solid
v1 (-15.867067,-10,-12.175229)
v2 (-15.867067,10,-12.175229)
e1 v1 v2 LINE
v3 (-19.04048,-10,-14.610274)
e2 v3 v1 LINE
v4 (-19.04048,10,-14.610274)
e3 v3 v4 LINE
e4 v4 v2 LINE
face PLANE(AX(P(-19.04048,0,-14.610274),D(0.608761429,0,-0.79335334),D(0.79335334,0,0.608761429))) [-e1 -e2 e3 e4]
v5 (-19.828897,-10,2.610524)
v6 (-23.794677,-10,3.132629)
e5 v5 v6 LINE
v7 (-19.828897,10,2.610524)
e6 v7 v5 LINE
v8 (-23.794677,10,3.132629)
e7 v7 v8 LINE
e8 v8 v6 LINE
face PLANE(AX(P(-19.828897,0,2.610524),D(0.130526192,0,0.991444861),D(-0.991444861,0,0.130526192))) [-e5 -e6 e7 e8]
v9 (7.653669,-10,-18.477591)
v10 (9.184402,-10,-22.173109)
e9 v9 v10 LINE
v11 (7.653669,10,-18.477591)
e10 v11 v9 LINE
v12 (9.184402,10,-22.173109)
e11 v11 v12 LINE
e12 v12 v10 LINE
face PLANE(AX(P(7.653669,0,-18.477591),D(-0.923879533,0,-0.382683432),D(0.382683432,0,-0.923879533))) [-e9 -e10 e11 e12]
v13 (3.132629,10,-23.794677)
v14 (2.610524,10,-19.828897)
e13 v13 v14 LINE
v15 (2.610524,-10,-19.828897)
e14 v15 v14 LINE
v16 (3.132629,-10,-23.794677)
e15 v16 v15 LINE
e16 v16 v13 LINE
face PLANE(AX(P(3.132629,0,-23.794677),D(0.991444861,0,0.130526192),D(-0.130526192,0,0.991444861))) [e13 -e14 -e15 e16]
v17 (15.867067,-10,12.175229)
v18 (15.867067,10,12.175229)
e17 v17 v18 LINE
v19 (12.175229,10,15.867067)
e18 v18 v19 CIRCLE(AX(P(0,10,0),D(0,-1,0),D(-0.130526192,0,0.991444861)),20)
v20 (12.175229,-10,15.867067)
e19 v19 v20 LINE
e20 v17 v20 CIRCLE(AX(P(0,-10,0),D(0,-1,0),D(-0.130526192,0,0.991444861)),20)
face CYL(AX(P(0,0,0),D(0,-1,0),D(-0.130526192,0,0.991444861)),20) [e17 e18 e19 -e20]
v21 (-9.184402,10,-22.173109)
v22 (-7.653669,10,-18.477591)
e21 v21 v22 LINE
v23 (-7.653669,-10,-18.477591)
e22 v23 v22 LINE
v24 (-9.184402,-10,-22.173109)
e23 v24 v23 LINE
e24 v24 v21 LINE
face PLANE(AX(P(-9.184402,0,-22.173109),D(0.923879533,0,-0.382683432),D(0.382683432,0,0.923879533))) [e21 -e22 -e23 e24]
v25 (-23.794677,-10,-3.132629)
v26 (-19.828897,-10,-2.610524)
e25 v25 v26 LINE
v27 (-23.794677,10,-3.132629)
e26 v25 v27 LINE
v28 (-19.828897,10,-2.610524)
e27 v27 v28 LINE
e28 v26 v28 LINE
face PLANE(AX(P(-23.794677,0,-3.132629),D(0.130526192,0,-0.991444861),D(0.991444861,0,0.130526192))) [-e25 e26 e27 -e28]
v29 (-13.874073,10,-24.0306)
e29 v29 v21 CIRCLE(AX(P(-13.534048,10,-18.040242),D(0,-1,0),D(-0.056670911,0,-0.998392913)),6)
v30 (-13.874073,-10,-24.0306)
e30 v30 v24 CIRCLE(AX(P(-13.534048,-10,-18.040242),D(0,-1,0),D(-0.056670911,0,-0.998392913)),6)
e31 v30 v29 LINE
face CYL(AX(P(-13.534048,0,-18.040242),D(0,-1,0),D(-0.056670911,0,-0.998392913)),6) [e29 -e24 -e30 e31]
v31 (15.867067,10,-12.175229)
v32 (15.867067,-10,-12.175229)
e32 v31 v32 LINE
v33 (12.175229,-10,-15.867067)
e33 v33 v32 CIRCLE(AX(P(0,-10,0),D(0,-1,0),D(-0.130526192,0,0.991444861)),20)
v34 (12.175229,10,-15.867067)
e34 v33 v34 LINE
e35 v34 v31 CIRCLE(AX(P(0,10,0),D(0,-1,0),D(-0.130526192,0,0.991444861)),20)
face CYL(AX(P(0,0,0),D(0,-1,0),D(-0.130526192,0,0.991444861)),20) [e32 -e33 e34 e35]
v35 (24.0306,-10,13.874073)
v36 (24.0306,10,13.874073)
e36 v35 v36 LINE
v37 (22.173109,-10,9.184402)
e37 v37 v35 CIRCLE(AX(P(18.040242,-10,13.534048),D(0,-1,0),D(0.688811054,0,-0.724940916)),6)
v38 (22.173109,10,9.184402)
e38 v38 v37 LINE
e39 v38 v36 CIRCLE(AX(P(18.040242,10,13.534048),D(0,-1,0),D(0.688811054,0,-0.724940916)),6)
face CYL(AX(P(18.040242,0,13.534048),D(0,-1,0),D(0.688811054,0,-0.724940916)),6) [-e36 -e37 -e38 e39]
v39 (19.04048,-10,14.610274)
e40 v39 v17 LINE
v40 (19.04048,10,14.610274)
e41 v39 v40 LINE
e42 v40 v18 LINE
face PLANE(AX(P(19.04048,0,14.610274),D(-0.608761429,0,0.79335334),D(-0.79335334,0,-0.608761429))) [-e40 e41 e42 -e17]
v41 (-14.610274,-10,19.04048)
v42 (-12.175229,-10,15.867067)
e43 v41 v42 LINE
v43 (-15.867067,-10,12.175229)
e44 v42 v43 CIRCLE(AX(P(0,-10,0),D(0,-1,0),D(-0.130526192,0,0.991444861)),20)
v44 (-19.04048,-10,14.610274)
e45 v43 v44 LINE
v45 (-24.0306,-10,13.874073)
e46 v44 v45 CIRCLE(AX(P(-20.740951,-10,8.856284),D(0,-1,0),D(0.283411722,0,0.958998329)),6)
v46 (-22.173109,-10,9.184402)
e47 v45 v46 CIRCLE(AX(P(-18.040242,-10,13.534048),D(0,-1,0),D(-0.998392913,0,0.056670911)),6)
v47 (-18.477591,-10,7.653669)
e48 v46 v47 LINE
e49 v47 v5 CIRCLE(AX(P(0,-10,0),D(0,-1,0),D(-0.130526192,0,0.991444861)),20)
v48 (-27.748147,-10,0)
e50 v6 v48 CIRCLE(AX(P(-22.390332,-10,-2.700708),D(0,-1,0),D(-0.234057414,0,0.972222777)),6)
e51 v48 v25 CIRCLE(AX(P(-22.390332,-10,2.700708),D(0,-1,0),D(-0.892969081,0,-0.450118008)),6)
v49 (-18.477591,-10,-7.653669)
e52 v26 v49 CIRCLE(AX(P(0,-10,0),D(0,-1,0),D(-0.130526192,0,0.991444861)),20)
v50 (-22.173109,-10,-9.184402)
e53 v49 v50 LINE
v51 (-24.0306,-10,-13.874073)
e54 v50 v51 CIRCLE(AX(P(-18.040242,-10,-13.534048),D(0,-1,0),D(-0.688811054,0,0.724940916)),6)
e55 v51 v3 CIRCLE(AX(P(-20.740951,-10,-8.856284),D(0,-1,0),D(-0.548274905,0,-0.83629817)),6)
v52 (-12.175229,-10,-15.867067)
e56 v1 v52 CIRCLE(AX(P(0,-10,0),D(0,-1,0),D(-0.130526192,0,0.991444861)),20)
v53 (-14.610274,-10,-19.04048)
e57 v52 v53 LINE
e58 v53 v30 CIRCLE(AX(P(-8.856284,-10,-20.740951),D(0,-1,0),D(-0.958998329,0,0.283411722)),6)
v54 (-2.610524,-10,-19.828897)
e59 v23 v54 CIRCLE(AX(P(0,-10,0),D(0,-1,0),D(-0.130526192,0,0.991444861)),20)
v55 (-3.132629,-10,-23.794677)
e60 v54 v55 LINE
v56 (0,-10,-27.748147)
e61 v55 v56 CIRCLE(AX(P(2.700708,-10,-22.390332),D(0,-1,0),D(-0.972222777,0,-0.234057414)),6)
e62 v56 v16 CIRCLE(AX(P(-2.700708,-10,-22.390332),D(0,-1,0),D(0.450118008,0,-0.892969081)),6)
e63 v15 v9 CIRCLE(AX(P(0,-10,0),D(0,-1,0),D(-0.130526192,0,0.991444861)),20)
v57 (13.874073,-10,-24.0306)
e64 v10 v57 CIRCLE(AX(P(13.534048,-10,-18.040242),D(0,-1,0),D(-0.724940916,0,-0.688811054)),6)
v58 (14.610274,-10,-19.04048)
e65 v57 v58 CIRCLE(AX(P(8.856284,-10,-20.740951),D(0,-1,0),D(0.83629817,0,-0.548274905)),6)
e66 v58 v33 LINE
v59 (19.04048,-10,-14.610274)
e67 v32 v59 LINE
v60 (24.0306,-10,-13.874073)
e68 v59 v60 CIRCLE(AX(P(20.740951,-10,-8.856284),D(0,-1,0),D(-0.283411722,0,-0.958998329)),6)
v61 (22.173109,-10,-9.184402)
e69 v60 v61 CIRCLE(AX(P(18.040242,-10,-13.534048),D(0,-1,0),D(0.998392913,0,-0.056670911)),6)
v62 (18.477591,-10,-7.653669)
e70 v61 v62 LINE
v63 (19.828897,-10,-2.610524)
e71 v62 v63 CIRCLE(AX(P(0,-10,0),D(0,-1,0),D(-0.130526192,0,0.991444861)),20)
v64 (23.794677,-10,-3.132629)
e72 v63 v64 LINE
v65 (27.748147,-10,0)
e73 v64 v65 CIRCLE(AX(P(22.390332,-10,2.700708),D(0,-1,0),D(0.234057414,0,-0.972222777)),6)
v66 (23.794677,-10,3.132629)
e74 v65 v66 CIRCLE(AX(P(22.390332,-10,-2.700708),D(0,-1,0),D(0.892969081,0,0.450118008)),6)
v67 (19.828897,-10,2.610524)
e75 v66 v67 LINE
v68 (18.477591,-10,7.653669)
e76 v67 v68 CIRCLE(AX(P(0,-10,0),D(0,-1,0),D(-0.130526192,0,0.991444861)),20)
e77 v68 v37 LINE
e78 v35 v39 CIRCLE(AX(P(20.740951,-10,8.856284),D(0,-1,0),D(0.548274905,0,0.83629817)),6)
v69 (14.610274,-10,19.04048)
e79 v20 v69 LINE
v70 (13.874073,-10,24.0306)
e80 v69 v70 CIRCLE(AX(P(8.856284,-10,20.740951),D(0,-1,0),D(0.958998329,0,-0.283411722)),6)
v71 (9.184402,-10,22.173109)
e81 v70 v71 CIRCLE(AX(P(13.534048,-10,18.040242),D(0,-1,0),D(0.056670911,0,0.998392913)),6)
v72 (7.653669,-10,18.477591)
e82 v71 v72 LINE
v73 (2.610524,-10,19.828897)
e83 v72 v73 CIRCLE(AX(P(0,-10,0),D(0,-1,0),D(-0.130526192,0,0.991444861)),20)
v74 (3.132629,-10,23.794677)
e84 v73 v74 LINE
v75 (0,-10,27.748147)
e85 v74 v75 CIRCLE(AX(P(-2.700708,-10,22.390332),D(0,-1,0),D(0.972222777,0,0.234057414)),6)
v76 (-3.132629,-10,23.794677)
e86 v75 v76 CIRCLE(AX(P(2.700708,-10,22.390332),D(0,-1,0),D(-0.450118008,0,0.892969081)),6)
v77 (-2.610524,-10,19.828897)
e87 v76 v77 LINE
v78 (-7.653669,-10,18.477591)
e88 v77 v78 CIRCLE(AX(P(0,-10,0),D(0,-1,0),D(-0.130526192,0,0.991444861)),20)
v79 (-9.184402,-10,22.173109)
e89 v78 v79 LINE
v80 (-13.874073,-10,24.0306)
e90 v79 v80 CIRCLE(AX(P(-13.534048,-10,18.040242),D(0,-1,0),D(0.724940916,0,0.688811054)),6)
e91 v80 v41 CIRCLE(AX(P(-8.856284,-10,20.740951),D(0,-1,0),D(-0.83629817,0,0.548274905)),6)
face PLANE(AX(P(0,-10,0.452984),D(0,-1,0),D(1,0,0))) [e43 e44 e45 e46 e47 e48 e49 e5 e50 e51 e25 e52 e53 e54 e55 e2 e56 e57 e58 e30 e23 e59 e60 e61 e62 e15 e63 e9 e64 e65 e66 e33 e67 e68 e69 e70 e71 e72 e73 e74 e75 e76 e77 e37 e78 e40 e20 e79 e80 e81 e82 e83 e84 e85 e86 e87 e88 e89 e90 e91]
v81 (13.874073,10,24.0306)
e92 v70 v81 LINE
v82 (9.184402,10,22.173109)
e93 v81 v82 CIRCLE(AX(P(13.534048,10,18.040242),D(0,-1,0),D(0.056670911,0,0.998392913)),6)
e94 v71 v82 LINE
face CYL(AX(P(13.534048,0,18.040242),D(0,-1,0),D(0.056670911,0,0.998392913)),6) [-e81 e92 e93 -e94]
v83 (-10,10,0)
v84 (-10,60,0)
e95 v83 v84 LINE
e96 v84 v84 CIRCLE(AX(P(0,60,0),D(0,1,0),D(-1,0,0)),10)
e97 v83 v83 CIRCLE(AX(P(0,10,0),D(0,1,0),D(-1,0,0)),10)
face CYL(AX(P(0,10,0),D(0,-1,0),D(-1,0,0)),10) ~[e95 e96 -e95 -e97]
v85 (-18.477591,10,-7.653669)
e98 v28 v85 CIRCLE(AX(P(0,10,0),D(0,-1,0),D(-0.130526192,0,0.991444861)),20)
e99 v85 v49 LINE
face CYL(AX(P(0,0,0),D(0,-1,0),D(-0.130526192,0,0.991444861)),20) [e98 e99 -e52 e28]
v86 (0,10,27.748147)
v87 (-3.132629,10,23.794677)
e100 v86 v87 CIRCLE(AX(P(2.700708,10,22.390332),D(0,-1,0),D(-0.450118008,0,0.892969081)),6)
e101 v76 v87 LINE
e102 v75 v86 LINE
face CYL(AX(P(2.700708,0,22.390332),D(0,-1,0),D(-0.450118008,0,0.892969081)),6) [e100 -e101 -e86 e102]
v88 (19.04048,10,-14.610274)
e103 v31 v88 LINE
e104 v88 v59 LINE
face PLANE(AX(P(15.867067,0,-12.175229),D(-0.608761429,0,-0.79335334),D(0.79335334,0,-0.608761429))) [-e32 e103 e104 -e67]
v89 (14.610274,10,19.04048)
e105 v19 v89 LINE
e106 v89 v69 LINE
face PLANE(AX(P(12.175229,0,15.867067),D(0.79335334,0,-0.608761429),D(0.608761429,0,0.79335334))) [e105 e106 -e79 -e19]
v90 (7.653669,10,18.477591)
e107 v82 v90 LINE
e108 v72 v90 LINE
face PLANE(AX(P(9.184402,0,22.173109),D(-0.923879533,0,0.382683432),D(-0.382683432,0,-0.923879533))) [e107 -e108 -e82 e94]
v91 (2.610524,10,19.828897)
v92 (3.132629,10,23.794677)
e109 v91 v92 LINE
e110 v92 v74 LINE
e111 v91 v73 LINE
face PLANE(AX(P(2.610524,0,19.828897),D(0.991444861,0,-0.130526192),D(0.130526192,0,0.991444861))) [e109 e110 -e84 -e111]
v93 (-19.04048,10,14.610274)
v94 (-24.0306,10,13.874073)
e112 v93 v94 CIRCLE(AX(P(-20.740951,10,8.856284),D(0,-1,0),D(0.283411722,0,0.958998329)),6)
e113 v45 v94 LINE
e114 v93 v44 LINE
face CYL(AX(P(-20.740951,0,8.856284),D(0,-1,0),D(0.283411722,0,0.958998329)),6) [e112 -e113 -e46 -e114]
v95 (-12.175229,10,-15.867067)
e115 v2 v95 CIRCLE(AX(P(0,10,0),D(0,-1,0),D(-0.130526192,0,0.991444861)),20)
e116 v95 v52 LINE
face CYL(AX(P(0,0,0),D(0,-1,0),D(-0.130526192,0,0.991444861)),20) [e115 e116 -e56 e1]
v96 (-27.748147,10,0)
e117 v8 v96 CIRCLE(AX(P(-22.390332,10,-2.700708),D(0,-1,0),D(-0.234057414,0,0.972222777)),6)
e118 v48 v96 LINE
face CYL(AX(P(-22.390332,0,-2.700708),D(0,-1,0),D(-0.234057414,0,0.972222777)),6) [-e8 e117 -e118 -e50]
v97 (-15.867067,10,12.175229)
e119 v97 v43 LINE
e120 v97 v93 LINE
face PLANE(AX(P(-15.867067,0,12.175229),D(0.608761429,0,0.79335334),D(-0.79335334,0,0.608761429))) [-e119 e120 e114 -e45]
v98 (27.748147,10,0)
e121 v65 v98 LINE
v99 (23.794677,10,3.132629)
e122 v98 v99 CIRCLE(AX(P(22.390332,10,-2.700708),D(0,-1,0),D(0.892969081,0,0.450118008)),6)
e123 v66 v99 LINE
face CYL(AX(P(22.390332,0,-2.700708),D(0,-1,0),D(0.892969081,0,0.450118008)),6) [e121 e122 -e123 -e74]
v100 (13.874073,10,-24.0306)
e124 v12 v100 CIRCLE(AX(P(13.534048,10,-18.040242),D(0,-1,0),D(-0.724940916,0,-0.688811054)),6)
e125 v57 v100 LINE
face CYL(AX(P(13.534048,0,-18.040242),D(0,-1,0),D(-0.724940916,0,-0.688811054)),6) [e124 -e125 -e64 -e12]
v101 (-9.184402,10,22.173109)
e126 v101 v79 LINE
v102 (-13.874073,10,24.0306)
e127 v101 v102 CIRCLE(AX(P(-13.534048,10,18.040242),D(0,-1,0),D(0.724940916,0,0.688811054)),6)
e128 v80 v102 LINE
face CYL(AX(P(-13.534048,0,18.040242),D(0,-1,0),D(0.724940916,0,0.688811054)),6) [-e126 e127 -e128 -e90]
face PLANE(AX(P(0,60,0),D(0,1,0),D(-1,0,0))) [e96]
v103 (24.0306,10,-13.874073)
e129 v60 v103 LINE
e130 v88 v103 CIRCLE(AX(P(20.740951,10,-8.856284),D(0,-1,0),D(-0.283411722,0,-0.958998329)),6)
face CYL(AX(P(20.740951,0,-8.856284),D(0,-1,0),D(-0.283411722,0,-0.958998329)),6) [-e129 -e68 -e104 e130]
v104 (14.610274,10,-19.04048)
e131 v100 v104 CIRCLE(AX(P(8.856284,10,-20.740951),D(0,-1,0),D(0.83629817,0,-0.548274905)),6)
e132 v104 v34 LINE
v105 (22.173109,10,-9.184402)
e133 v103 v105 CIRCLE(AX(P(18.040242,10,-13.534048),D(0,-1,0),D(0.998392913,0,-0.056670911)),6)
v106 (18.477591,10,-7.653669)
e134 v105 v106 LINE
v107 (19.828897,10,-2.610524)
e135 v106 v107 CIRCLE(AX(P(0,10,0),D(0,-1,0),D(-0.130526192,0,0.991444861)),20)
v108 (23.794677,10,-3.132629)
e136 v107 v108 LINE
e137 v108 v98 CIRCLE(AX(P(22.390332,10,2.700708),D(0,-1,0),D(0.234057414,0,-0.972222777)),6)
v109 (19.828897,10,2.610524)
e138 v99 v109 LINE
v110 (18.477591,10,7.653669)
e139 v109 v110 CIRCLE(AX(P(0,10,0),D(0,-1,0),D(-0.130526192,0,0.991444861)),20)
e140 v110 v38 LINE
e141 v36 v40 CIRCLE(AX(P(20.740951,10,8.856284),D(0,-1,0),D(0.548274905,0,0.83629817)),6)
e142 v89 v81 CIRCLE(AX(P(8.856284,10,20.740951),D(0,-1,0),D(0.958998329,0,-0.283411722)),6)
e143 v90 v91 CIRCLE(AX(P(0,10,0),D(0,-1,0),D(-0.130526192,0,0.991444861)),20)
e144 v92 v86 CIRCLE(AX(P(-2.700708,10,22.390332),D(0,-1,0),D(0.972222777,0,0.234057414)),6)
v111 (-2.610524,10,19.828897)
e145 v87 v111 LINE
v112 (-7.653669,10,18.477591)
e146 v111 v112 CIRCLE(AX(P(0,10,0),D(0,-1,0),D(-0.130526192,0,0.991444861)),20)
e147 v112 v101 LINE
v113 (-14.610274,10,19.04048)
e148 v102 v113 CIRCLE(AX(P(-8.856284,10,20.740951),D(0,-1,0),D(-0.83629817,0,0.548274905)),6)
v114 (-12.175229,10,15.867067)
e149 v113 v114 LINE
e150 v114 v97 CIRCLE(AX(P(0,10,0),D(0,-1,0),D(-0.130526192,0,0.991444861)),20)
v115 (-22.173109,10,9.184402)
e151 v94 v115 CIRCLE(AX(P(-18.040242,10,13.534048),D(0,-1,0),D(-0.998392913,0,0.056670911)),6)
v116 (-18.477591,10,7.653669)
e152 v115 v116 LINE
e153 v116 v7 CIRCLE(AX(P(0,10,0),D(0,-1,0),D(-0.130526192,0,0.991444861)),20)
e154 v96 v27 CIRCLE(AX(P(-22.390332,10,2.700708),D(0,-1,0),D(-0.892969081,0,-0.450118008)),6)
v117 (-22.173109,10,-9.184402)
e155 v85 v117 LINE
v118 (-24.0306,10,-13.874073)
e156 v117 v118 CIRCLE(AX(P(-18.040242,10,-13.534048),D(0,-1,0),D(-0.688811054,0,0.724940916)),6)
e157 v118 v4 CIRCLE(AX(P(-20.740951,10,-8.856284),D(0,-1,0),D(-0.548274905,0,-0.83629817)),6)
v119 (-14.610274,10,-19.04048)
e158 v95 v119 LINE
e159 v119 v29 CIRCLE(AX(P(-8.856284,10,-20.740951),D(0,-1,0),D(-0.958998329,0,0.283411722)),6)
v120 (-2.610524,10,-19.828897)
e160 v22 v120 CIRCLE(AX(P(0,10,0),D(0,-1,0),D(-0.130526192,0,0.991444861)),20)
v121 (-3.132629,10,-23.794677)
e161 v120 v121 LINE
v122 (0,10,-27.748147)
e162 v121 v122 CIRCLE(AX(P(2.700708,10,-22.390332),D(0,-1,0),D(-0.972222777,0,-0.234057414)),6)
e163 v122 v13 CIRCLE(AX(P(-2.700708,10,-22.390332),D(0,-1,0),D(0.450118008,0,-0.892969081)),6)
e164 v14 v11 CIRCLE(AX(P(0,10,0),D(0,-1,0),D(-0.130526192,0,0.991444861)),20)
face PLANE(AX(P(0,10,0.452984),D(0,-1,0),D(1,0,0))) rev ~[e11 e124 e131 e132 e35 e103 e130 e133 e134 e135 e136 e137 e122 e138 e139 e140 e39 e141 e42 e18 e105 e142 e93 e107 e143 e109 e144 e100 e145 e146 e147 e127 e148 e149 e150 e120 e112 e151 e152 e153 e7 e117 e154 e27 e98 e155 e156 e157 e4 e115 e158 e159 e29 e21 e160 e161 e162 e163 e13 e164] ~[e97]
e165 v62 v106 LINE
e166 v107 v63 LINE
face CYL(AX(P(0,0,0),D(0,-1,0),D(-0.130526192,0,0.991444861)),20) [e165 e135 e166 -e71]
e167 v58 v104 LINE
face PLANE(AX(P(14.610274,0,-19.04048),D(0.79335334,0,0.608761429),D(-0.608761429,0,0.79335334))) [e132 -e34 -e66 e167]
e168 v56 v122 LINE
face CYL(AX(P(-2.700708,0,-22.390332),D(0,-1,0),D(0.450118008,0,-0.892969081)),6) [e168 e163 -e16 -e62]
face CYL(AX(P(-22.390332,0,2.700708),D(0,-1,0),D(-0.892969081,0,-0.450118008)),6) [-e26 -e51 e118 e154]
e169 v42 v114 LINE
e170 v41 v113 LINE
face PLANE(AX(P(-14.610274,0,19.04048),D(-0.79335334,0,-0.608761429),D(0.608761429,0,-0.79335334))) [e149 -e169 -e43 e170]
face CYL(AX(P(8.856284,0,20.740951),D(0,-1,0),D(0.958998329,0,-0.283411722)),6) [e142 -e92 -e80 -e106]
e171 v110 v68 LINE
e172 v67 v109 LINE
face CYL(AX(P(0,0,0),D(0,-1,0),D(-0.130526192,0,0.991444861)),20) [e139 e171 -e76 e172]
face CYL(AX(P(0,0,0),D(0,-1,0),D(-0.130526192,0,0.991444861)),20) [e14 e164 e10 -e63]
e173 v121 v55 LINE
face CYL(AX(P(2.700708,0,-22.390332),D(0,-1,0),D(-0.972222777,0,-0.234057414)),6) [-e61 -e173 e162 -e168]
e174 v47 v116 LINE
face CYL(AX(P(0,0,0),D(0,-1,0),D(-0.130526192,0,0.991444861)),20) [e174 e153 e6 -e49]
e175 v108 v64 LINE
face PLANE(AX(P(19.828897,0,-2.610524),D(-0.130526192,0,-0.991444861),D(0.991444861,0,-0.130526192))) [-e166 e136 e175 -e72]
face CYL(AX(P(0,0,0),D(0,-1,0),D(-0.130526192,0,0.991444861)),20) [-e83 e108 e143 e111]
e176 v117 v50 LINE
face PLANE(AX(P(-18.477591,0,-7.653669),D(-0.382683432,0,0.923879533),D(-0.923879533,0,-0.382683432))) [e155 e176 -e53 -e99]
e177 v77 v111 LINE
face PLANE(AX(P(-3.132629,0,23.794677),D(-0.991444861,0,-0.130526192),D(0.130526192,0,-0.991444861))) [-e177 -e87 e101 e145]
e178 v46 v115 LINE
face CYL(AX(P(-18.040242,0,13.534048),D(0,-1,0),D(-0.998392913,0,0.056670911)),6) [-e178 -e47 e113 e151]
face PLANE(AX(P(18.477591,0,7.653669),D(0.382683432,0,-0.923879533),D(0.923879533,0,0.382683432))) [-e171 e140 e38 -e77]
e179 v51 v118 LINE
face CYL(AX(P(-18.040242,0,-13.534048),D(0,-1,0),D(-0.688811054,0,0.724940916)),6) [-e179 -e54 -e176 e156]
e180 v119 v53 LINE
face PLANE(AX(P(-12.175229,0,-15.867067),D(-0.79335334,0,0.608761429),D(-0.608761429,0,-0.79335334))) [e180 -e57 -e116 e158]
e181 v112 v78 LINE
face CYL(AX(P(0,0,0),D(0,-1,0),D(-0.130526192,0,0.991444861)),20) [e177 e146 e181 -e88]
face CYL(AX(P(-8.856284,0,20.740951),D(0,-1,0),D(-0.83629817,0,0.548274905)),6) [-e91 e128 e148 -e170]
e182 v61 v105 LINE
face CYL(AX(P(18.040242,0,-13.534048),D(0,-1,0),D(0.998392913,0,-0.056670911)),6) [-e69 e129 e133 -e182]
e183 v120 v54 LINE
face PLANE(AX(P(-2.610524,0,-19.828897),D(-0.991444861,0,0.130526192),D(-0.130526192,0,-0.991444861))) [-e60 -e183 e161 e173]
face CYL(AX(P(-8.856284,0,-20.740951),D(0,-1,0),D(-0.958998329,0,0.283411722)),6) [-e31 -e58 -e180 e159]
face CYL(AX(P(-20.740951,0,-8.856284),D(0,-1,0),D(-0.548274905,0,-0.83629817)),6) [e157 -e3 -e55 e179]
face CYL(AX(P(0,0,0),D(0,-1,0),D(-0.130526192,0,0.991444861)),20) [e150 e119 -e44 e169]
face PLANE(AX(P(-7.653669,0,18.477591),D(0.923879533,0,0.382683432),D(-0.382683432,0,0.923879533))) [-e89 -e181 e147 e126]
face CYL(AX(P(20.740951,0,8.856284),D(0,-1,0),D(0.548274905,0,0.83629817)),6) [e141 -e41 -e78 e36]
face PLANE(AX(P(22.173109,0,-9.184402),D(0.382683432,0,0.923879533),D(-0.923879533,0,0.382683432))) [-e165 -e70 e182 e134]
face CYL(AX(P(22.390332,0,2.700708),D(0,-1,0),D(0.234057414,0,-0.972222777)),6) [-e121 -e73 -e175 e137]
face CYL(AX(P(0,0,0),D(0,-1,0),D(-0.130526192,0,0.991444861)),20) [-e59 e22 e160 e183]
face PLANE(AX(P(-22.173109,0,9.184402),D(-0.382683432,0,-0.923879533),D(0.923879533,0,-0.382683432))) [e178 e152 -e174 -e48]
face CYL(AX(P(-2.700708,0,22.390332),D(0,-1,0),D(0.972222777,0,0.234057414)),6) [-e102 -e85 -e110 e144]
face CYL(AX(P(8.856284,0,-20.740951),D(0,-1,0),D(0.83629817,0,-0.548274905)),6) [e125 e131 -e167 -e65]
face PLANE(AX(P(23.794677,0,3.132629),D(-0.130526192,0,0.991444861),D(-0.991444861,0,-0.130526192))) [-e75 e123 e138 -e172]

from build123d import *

# Parameters (mm, degrees)
F2_DEPTH        = 10
F2_COPIES_COUNT = 12
F4_R            = 10
F5_DEPTH        = 50


# Not quite as in the source:
# - a feature of the source that left no trace in its solid (it failed there, or was rolled back) is left out
# - a pattern or mirror of a feature is missing from the dataset's text; its kind, count and spacing are read off the source's solid


with BuildPart() as f2:
    # F1 (on Front) → F2 (new body, symmetric)
    with BuildSketch(Plane.XZ):
        with BuildLine():
            ThreePointArc((-2.6105238444, 19.8288972275), (-13.186916302, -15.0367961496), (20, 0))
            ThreePointArc((20, 0), (15.0367961496, 13.186916302), (2.6105238444, 19.8288972275))
            ThreePointArc((2.6105238444, 19.8288972275), (0, 20), (-2.6105238444, 19.8288972275))
        make_face()
        with BuildLine():
            ThreePointArc((-2.6105238444, 19.8288972275), (0, 20), (2.6105238444, 19.8288972275))
            Line((2.6105238444, 19.8288972275), (3.1326286133, 23.794676673))
            ThreePointArc((3.1326286133, 23.794676673), (2.0019466325, 26.1165955987), (0, 27.7481466766))
            ThreePointArc((0, 27.7481466766), (-2.0019466325, 26.1165955987), (-3.1326286133, 23.794676673))
            Line((-3.1326286133, 23.794676673), (-2.6105238444, 19.8288972275))
        make_face()
    extrude(amount=F2_DEPTH, both=True)

    # F2_copies: F2 ×12 about axis
    f2_copies_axis = Axis((0, 0, 0), (0, 1, 0))


with BuildPart() as f2_1:
    add(f2.part)
    for i in range(1, F2_COPIES_COUNT):
        add(f2.part.rotate(f2_copies_axis, i * 360 / F2_COPIES_COUNT))

    # F4 (on face) → F5 (join)
    with BuildSketch(Plane(origin=(0, 10, 0), x_dir=(-1, 0, 0), z_dir=(0, 1, 0))):
        Circle(F4_R)
    extrude(amount=F5_DEPTH)


solid = f2_1.part
